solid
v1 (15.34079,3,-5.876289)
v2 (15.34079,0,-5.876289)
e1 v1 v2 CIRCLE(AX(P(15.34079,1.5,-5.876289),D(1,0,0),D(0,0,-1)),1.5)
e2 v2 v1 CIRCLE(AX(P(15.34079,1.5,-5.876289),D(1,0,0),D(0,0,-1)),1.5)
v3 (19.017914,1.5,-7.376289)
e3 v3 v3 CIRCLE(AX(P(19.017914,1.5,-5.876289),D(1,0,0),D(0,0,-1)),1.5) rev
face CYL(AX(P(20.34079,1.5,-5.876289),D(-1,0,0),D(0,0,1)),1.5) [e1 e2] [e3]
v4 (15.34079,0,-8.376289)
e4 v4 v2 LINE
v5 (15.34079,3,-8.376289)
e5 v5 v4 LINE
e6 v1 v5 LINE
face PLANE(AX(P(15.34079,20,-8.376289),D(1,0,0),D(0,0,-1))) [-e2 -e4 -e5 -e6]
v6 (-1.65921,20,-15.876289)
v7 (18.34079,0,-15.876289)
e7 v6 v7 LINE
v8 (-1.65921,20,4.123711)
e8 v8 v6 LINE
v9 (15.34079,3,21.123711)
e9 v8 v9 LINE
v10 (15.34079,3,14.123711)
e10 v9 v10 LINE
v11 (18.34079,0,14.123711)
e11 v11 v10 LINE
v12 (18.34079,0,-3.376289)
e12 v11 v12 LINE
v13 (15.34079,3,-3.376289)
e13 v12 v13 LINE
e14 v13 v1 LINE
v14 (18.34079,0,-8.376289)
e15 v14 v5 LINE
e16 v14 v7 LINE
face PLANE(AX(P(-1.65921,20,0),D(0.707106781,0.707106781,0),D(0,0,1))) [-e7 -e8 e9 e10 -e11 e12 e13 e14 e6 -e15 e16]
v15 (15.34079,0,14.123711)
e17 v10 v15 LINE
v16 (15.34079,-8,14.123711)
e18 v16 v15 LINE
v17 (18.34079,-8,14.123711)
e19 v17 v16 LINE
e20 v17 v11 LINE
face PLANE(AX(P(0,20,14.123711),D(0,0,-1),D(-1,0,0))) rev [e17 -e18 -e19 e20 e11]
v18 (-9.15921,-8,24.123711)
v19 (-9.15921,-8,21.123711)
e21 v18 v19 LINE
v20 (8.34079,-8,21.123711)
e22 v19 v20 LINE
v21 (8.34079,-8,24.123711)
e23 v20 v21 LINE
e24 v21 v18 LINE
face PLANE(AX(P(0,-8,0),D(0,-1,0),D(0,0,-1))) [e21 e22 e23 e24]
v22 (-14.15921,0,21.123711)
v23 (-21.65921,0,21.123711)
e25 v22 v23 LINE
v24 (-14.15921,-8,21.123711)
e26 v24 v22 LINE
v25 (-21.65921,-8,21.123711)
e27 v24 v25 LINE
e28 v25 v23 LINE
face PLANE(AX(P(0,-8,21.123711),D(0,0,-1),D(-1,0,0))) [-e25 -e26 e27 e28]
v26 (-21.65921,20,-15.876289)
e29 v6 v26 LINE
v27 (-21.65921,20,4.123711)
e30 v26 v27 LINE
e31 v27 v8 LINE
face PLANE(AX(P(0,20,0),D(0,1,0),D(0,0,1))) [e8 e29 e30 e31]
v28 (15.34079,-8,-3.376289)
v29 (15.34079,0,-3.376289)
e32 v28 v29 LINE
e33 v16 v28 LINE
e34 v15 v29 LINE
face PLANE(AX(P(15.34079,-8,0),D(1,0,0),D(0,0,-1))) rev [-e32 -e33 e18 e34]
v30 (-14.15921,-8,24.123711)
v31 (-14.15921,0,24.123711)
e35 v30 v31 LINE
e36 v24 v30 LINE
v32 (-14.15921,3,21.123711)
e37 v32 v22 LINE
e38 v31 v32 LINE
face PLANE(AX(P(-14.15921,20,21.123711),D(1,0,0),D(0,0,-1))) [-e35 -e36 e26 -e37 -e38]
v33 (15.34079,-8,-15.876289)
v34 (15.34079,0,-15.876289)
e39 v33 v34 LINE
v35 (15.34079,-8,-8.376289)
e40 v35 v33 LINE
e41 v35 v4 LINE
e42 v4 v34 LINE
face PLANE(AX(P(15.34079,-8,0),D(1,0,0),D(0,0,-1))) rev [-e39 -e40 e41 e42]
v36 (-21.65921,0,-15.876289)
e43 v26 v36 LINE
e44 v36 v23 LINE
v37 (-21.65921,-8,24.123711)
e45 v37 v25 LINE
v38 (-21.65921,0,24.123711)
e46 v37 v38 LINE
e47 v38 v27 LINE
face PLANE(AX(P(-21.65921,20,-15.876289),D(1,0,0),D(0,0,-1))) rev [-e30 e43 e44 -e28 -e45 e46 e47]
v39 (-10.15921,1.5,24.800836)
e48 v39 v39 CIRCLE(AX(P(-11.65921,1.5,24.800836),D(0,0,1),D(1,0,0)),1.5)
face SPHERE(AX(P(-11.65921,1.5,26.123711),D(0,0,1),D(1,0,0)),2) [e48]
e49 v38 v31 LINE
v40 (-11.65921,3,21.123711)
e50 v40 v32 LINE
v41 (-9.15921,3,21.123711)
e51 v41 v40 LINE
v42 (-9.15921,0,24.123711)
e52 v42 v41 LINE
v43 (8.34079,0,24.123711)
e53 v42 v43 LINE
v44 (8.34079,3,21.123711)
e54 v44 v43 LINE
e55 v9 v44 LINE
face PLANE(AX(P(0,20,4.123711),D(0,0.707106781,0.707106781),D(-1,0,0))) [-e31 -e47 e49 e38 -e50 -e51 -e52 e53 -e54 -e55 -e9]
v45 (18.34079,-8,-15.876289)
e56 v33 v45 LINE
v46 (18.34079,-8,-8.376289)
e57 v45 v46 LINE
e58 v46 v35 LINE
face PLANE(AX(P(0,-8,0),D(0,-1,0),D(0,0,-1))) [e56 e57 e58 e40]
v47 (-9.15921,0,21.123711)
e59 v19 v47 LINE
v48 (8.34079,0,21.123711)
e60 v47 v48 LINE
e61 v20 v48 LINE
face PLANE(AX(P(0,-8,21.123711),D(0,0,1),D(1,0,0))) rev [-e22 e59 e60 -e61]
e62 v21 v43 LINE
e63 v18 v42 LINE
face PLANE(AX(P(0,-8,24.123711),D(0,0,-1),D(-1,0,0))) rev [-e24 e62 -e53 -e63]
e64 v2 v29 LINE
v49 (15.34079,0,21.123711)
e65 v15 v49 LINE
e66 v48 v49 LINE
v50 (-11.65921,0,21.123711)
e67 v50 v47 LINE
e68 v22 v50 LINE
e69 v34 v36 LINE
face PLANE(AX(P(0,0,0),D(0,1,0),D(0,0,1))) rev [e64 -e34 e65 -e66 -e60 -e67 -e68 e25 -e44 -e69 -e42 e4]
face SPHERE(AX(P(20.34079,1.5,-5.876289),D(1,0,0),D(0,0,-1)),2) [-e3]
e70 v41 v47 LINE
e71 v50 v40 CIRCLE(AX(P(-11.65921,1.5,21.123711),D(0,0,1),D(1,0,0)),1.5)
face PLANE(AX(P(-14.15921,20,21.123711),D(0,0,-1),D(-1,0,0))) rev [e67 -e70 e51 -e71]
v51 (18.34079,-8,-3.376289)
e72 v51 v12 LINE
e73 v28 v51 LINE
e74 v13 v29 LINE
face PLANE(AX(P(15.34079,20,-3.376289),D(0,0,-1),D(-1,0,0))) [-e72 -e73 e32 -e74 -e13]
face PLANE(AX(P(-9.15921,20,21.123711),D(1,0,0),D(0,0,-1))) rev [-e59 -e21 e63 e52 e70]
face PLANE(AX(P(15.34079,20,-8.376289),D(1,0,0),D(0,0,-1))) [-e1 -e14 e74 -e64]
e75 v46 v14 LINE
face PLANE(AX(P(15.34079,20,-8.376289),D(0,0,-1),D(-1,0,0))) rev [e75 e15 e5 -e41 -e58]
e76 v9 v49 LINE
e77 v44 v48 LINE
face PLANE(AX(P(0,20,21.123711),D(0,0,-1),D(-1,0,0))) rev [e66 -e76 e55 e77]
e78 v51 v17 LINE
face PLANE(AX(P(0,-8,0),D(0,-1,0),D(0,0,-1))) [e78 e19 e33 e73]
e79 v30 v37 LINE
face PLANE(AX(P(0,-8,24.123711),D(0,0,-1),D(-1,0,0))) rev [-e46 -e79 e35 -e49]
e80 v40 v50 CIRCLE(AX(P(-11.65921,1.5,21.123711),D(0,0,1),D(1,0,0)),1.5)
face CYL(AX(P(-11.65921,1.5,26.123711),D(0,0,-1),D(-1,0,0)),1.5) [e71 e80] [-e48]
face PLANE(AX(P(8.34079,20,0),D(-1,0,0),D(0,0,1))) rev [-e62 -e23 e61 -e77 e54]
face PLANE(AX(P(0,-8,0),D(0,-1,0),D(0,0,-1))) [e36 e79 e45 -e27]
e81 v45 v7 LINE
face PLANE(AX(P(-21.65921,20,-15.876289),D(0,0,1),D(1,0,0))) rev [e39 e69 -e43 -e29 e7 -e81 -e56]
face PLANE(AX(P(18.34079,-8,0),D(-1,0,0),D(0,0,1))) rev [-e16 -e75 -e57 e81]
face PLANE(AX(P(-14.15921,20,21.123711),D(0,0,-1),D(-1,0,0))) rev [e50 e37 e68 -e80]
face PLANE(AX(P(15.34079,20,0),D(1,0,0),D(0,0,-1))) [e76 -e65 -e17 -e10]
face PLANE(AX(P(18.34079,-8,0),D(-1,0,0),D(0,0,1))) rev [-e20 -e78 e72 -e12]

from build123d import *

# Parameters (mm, degrees)
SKETCH1_W           = 40
SKETCH1_H           = 40
BOSS_EXTRUDE1_DEPTH = 20
CHAMFER1_SIZE       = 20
SKETCH2_W           = 3
SKETCH2_H           = 5
SKETCH2_W_2         = 5
SKETCH2_H_2         = 3
CUT_EXTRUDE1_DEPTH  = 20
SKETCH3_W           = 17.5
SKETCH3_H           = 3
SKETCH3_W_2         = 3
SKETCH3_H_2         = 17.5
SKETCH3_H_3         = 7.5
SKETCH3_W_3         = 7.5
BOSS_EXTRUDE2_DEPTH = 8
SKETCH4_R           = 1.5
BOSS_EXTRUDE3_DEPTH = 5
SKETCH6_R           = 1.5
BOSS_EXTRUDE4_DEPTH = 5


with BuildPart() as part:
    # Sketch1 → Boss-Extrude1 (new body)
    with BuildSketch(Plane(origin=(0, 0, 0), x_dir=(1, 0, 0), z_dir=(0, 1, 0))):
        with Locations((-1.65921027, -4.12371134)):
            Rectangle(SKETCH1_W, SKETCH1_H)
    extrude(amount=BOSS_EXTRUDE1_DEPTH)

    # Chamfer1
    chamfer1_edges = [part.edges().sort_by_distance(p)[0] for p in [
        (18.34078973, 20, 4.12371134),
        (-1.65921027, 20, 24.12371134),
    ]]
    chamfer(chamfer1_edges, length=CHAMFER1_SIZE - 0.0001)  # a hair under: the kernel refuses the full size

    # Sketch2 → Cut-Extrude1 (cut)
    with BuildSketch(Plane.XZ):
        Polygon((15.34078973, 21.12371134), (15.34078973, 14.12371134), (18.34078973, 14.12371134), (18.34078973, 24.12371134), (8.34078973, 24.12371134), (8.34078973, 21.12371134), align=None)
        with Locations((16.84078973, -5.87628866)):
            Rectangle(SKETCH2_W, SKETCH2_H)
        with Locations((-11.65921027, 22.62371134)):
            Rectangle(SKETCH2_W_2, SKETCH2_H_2)
    extrude(amount=-CUT_EXTRUDE1_DEPTH, mode=Mode.SUBTRACT)

    # Sketch3 → Boss-Extrude2 (add)
    with BuildSketch(Plane.XZ):
        with Locations((-0.40921027, 22.62371134)):
            Rectangle(SKETCH3_W, SKETCH3_H)
        with Locations((16.84078973, 5.37371134)):
            Rectangle(SKETCH3_W_2, SKETCH3_H_2)
        with Locations((16.84078973, -12.12628866)):
            Rectangle(SKETCH3_W_2, SKETCH3_H_3)
        with Locations((-17.90921027, 22.62371134)):
            Rectangle(SKETCH3_W_3, SKETCH3_H)
    extrude(amount=BOSS_EXTRUDE2_DEPTH)

    # Sketch4 → Boss-Extrude3 (add)
    with BuildSketch(Plane.XY.offset(21.12371134)):
        with Locations(Location((-11.65921027, 1.5, 0), (0, 0, 270))):
            Circle(SKETCH4_R)
    extrude(amount=BOSS_EXTRUDE3_DEPTH)

    # Sketch5 → Revolve1 (revolve)
    with BuildSketch(Plane.XY.offset(26.12371134)):
        with BuildLine():
            Line((-11.65921027, 3.5), (-11.65921027, -0.5))
            ThreePointArc((-11.65921027, -0.5), (-9.65921027, 1.5), (-11.65921027, 3.5))
        make_face()
    revolve(axis=Axis((-11.65921027, 3.5, 26.12371134), (0, -1, 0)))

    # Sketch6 → Boss-Extrude4 (add)
    with BuildSketch(Plane(origin=(15.34078973, 0, 0), x_dir=(0, 0, -1), z_dir=(1, 0, 0))):
        with Locations(Location((5.87628866, 1.5, 0), (0, 0, 270))):
            Circle(SKETCH6_R)
    extrude(amount=BOSS_EXTRUDE4_DEPTH)

    # Sketch7 → Revolve2 (revolve)
    with BuildSketch(Plane(origin=(20.34078973, 0, 0), x_dir=(0, 0, -1), z_dir=(1, 0, 0))):
        with BuildLine():
            Line((5.87628866, 3.5), (5.87628866, -0.5))
            ThreePointArc((5.87628866, -0.5), (3.87628866, 1.5), (5.87628866, 3.5))
        make_face()
    revolve(axis=Axis((20.34078973, 3.5, -5.87628866), (0, -1, 0)))


solid = part.part
